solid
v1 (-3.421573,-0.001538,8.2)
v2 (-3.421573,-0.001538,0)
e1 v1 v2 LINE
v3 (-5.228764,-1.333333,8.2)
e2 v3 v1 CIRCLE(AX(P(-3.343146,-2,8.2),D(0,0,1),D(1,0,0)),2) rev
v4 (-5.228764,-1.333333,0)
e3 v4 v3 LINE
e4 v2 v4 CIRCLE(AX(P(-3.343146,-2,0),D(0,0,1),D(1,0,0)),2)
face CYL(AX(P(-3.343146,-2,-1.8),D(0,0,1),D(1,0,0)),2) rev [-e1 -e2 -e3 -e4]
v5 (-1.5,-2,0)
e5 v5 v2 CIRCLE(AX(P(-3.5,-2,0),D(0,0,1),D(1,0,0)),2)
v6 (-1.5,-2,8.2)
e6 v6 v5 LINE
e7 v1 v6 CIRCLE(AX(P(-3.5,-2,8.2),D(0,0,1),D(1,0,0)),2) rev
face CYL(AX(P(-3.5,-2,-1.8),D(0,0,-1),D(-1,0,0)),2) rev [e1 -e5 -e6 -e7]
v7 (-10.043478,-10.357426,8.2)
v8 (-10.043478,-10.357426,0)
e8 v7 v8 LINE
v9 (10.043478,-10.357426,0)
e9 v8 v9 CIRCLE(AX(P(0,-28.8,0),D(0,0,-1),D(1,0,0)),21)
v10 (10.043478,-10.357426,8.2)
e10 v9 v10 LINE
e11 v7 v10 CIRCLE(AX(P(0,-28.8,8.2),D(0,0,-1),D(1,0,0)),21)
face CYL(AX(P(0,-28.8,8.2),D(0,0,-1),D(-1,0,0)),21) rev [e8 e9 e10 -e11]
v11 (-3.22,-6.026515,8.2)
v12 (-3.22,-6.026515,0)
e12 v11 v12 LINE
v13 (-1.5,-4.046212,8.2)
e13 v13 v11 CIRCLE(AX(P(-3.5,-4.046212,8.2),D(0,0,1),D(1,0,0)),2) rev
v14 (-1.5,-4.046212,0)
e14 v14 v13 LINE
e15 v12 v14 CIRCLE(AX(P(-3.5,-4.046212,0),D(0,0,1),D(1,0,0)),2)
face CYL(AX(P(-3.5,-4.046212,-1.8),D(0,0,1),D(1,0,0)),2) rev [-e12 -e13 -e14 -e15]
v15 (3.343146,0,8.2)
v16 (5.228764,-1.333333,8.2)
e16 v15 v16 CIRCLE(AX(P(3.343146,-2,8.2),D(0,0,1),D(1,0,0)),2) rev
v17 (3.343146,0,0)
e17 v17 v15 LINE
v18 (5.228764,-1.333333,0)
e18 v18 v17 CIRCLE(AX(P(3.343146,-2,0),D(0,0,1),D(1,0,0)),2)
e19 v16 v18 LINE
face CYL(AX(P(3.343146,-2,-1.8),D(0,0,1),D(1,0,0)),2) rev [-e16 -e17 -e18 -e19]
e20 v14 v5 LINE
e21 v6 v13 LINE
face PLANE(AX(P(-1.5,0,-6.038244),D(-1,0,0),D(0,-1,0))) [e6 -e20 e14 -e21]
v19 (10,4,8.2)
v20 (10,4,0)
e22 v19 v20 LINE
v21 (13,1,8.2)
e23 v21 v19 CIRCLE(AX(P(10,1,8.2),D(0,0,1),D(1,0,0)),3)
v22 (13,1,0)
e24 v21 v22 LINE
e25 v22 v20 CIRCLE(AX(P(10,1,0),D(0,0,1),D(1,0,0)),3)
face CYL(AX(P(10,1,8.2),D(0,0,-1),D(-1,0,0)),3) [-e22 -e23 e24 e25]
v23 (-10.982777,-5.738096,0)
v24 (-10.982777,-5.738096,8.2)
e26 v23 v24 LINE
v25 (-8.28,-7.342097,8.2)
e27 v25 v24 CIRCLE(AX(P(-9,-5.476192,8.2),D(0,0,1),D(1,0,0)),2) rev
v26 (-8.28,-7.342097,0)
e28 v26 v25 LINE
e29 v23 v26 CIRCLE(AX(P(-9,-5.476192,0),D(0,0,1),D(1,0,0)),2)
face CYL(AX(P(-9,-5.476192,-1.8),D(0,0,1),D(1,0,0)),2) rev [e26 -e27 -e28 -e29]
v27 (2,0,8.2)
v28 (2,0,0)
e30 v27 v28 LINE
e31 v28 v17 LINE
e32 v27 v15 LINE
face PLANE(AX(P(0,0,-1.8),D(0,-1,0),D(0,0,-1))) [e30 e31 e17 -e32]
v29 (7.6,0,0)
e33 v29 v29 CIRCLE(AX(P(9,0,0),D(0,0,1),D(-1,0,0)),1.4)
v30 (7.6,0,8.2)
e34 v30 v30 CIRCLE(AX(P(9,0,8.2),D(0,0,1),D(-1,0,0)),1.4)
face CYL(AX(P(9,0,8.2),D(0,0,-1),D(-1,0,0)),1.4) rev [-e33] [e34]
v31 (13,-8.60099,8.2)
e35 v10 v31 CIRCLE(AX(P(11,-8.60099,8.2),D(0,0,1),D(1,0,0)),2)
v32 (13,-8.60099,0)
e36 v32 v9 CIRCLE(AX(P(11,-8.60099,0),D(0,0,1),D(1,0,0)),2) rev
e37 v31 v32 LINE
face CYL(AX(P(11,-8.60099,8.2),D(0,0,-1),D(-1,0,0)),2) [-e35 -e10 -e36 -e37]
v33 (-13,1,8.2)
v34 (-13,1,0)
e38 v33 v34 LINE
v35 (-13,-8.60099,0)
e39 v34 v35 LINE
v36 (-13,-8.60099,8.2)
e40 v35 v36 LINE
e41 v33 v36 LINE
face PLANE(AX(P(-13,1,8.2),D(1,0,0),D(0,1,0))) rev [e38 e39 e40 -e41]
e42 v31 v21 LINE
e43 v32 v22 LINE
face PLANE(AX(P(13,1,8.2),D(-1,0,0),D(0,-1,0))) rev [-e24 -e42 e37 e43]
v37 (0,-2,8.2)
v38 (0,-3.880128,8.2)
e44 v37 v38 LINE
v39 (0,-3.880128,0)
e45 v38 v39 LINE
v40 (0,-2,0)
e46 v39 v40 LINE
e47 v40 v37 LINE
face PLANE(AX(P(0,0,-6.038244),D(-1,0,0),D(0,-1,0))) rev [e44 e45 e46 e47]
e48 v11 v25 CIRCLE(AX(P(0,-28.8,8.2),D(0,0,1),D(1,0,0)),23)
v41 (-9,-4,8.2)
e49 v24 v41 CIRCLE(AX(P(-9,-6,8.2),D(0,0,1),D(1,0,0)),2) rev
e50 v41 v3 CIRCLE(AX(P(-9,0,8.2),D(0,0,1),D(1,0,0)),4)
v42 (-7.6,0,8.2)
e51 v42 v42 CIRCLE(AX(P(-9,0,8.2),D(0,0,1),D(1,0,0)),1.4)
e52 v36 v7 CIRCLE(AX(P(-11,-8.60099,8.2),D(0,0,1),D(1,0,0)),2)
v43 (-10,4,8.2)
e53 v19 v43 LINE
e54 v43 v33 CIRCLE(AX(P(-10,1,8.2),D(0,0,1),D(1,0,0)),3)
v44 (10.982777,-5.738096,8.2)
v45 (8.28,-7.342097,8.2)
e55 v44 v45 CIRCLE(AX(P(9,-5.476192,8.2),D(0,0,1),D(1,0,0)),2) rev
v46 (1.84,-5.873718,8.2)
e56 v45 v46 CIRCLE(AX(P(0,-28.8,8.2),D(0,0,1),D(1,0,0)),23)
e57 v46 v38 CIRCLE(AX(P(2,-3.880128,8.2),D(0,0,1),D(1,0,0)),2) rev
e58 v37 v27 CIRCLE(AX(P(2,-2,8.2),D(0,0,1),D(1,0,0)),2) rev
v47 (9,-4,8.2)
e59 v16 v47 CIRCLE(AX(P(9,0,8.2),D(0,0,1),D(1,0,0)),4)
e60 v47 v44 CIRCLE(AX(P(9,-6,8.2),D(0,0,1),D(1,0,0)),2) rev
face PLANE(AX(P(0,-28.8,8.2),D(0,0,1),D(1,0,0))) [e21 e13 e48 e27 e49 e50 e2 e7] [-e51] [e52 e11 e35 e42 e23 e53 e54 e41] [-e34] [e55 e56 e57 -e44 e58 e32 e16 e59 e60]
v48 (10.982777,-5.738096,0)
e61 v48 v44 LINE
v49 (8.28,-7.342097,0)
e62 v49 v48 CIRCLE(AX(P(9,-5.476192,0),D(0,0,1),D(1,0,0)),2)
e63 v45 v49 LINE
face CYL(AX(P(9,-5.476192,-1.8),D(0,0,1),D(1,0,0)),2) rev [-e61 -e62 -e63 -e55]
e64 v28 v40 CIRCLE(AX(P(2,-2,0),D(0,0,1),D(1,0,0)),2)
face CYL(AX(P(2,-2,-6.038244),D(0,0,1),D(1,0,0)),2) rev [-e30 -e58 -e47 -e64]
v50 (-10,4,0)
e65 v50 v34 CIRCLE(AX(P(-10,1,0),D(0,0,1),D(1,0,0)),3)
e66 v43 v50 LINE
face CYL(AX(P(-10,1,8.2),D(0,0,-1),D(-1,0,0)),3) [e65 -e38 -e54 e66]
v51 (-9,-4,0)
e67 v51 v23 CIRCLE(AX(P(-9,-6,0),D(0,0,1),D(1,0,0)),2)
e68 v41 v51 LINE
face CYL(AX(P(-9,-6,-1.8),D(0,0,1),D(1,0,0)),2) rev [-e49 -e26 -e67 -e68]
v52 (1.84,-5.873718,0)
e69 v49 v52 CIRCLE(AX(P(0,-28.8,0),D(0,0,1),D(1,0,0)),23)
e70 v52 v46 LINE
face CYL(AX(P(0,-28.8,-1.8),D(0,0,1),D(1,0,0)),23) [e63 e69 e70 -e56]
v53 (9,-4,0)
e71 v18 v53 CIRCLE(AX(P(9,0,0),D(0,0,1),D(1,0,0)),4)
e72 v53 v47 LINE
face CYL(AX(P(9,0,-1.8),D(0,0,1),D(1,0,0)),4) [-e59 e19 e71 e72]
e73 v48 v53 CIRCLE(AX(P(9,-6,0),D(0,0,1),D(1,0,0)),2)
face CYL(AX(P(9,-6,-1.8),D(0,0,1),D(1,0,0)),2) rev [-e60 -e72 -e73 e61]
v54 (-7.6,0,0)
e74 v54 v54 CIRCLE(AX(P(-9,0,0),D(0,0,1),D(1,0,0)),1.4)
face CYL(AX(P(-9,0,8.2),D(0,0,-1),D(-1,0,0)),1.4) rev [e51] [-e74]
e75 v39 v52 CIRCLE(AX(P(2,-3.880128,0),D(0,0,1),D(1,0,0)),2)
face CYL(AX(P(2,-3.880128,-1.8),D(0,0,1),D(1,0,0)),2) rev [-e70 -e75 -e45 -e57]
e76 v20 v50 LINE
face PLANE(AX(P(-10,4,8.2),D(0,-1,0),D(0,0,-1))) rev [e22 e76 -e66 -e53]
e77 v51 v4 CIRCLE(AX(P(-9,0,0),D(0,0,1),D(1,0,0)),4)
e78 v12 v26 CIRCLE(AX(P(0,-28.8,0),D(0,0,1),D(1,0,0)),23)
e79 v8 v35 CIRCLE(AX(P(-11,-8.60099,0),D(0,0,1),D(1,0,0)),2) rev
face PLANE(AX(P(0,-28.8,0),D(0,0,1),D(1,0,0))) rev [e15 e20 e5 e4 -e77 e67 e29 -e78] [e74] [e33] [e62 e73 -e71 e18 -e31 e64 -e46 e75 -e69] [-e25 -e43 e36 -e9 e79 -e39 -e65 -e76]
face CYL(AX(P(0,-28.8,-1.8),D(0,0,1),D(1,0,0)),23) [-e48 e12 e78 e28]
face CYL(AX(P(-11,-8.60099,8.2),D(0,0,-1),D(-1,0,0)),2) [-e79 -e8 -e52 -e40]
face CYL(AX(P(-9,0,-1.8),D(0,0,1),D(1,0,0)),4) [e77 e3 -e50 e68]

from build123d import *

# Parameters (mm, degrees)
SKETCH_1_R          = 1.4
EXTRUDE_1_DEPTH     = 8.2
CUT_EXTRUDE_1_DEPTH = 10
EXTRUDE_2_DEPTH     = 8.2
FILLET_1_R          = 2


with BuildPart() as part:
    # 草图1 → 凸台-拉伸1 (new body)
    with BuildSketch(Plane.XY):
        with BuildLine():
            Line((-13, 1), (-13, -12.307577498))
            ThreePointArc((-13, -12.307577498), (0, -7.8), (13, -12.307577498))
            Line((13, -12.307577498), (13, 1))
            ThreePointArc((13, 1), (12.121320344, 3.121320344), (10, 4))
            Line((10, 4), (-10, 4))
            ThreePointArc((-10, 4), (-12.121320344, 3.121320344), (-13, 1))
        make_face()
        with Locations((-9, 0)):
            Circle(SKETCH_1_R, mode=Mode.SUBTRACT)
        with Locations(Location((9, 0, 0), (0, 0, 180))):
            Circle(SKETCH_1_R, mode=Mode.SUBTRACT)
    extrude(amount=EXTRUDE_1_DEPTH)

    # 草图2 → 切除-拉伸1 (cut)
    with BuildSketch(Plane.XY.offset(8.2)):
        with BuildLine():
            ThreePointArc((-5, 0), (-7, -3.464101615), (-11, -3.464101615))
            Line((-11, -3.464101615), (-11, -8.600990123))
            ThreePointArc((-11, -8.600990123), (0, -5.8), (11, -8.600990123))
            Line((11, -8.600990123), (11, -3.464101615))
            ThreePointArc((11, -3.464101615), (7, -3.464101615), (5, 0))
            Line((5, 0), (-5, 0))
        make_face()
    extrude(amount=-CUT_EXTRUDE_1_DEPTH, mode=Mode.SUBTRACT)

    # 草图3 → 凸台-拉伸2 (add)
    with BuildSketch(Plane.XY.offset(8.2)):
        with BuildLine():
            Line((0, -5.8), (0, 0))
            Line((0, 0), (-1.5, 0))
            Line((-1.5, 0), (-1.5, -5.848965165))
            ThreePointArc((-1.5, -5.848965165), (-0.750399492, -5.812244551), (0, -5.8))
        make_face()
    extrude(amount=-EXTRUDE_2_DEPTH)

    # 圆角1
    # the kernel refuses this fillet: 2 mm, written as the material it adds along each edge
    with BuildSketch(Plane(origin=(-11, -8.600990123, 8.2), x_dir=(0, 1, 0), z_dir=(0, 0, -1))) as fillet_1_piece_1:
        with BuildLine():
            CenterArc((3.124797703, 2), FILLET_1_R, 158.899803976, 111.100196024)
            ThreePointArc((1.258893096, 2.72), (0.673800117, 1.339471911), (0, 0))
            Line((0, 0), (3.124797703, 0))
        make_face()
    extrude(amount=8.2)
    with BuildSketch(Plane(origin=(-11, -3.464101615, 8.2), x_dir=(0.9659258262890684, -0.2588190451025207, 0), z_dir=(0, 0, -1))) as fillet_1_piece_2:
        with BuildLine():
            CenterArc((2.588190451, 1.931851653), FILLET_1_R, 165, 90)
            Line((0.656338798, 2.449489743), (0, 0))
            ThreePointArc((0, 0), (1.03527618, 0.136296695), (2.070552361, 0))
        make_face()
    extrude(amount=8.2)
    with BuildSketch(Plane(origin=(-5, 0, 8.2), x_dir=(1, 0, 0), z_dir=(0, 0, -1))) as fillet_1_piece_3:
        with BuildLine():
            CenterArc((1.656854249, 2), FILLET_1_R, 199.471220634, 70.528779366)
            ThreePointArc((-0.228763834, 1.333333333), (-0.057605761, 0.676407915), (0, 0))
            Line((0, 0), (1.656854249, 0))
        make_face()
    extrude(amount=8.2)
    with BuildSketch(Plane(origin=(11, -3.464101615, 8.2), x_dir=(0, -1, 0), z_dir=(0, 0, -1))) as fillet_1_piece_4:
        with BuildLine():
            CenterArc((2.535898385, 2), FILLET_1_R, 180, 90)
            ThreePointArc((0.535898385, 2), (0.39960169, 0.96472382), (0, 0))
            Line((0, 0), (2.535898385, 0))
        make_face()
    extrude(amount=8.2)
    with BuildSketch(Plane(origin=(11, -8.600990123, 8.2), x_dir=(-0.9075134779972225, 0.42002296038833975, 0), z_dir=(0, 0, -1))) as fillet_1_piece_5:
        with BuildLine():
            CenterArc((3.127513738, 1.99575011), FILLET_1_R, 155.163962917, 111.100196024)
            Line((1.312486782, 2.835796031), (0, 0))
            ThreePointArc((0, 0), (1.498600333, 0.04887373), (2.997200665, 0))
        make_face()
    extrude(amount=8.2)
    with BuildSketch(Plane(origin=(5, 0, 8.2), x_dir=(-1, 0, 0), z_dir=(0, 0, -1))) as fillet_1_piece_6:
        with BuildLine():
            CenterArc((1.656854249, -2), FILLET_1_R, 90, 70.528779366)
            ThreePointArc((-0.228763834, -1.333333333), (-0.057605761, -0.676407915), (0, 0))
            Line((0, 0), (1.656854249, 0))
        make_face()
    extrude(amount=8.2)
    with BuildSketch(Plane(origin=(-1.5, 0, 8.2), x_dir=(-1, 0, 0), z_dir=(0, 0, -1))) as fillet_1_piece_7:
        with BuildLine():
            CenterArc((FILLET_1_R, -FILLET_1_R), FILLET_1_R, 90, 90)
            Line((0, -FILLET_1_R), (0, 0))
            Line((0, 0), (FILLET_1_R, 0))
        make_face()
    extrude(amount=8.2)
    with BuildSketch(Plane(origin=(-1.5, -5.848965165, 8.2), x_dir=(-0.994714309544396, -0.10268126600123115, 0), z_dir=(0, 0, -1))) as fillet_1_piece_8:
        with BuildLine():
            CenterArc((1.804319684, 1.998586493), FILLET_1_R, 185.893590739, 81.952153753)
            Line((-0.185108935, 1.793223961), (0, 0))
            ThreePointArc((0, 0), (0.864569849, 0.016255332), (1.729139697, 0))
        make_face()
    extrude(amount=8.2)
    with BuildSketch(Plane(origin=(0, -5.8, 8.2), x_dir=(0.9991983946019533, -0.04003208993893798, 0), z_dir=(0, 0, -1))) as fillet_1_piece_9:
        with BuildLine():
            CenterArc((1.921540317, -1.998396789), FILLET_1_R, 92.294282868, 85.411434264)
            Line((-0.076856472, -1.918332609), (0, 0))
            ThreePointArc((0, 0), (0.920738069, -0.018436924), (1.841476137, 0))
        make_face()
    extrude(amount=8.2)
    with BuildSketch(Plane(origin=(0, 0, 8.2), x_dir=(1, 0, 0), z_dir=(0, 0, -1))) as fillet_1_piece_10:
        with BuildLine():
            CenterArc((FILLET_1_R, FILLET_1_R), FILLET_1_R, 180, 90)
            Line((0, FILLET_1_R), (0, 0))
            Line((0, 0), (FILLET_1_R, 0))
        make_face()
    extrude(amount=8.2)
    # the kernel refuses this fillet: 2 mm, written as the material it takes off along each edge
    with BuildSketch(Plane(origin=(13, -12.307577498, -9.266468436), x_dir=(-0.8347589906571732, 0.5506154987984059, 0), z_dir=(0, 0, 1))) as fillet_1_2_piece_1:
        with BuildLine():
            CenterArc((3.710422437, -1.992876138), FILLET_1_R, 94.837370868, 118.571878142)
            Line((2.040904456, -3.094107135), (0, 0))
            ThreePointArc((0, 0), (1.770883436, -0.074800554), (3.541766872, 0))
        make_face()
    extrude(amount=26.732936871, mode=Mode.SUBTRACT)
    with BuildSketch(Plane(origin=(-13, -12.307577498, -9.266468436), x_dir=(0, 1, 0), z_dir=(0, 0, 1))) as fillet_1_2_piece_2:
        with BuildLine():
            CenterArc((3.706587374, -2), FILLET_1_R, 90, 118.571878142)
            ThreePointArc((1.950151733, -2.956521739), (1.037516301, -1.437074525), (0, 0))
            Line((0, 0), (3.706587374, 0))
        make_face()
    extrude(amount=26.732936871, mode=Mode.SUBTRACT)


solid = part.part
